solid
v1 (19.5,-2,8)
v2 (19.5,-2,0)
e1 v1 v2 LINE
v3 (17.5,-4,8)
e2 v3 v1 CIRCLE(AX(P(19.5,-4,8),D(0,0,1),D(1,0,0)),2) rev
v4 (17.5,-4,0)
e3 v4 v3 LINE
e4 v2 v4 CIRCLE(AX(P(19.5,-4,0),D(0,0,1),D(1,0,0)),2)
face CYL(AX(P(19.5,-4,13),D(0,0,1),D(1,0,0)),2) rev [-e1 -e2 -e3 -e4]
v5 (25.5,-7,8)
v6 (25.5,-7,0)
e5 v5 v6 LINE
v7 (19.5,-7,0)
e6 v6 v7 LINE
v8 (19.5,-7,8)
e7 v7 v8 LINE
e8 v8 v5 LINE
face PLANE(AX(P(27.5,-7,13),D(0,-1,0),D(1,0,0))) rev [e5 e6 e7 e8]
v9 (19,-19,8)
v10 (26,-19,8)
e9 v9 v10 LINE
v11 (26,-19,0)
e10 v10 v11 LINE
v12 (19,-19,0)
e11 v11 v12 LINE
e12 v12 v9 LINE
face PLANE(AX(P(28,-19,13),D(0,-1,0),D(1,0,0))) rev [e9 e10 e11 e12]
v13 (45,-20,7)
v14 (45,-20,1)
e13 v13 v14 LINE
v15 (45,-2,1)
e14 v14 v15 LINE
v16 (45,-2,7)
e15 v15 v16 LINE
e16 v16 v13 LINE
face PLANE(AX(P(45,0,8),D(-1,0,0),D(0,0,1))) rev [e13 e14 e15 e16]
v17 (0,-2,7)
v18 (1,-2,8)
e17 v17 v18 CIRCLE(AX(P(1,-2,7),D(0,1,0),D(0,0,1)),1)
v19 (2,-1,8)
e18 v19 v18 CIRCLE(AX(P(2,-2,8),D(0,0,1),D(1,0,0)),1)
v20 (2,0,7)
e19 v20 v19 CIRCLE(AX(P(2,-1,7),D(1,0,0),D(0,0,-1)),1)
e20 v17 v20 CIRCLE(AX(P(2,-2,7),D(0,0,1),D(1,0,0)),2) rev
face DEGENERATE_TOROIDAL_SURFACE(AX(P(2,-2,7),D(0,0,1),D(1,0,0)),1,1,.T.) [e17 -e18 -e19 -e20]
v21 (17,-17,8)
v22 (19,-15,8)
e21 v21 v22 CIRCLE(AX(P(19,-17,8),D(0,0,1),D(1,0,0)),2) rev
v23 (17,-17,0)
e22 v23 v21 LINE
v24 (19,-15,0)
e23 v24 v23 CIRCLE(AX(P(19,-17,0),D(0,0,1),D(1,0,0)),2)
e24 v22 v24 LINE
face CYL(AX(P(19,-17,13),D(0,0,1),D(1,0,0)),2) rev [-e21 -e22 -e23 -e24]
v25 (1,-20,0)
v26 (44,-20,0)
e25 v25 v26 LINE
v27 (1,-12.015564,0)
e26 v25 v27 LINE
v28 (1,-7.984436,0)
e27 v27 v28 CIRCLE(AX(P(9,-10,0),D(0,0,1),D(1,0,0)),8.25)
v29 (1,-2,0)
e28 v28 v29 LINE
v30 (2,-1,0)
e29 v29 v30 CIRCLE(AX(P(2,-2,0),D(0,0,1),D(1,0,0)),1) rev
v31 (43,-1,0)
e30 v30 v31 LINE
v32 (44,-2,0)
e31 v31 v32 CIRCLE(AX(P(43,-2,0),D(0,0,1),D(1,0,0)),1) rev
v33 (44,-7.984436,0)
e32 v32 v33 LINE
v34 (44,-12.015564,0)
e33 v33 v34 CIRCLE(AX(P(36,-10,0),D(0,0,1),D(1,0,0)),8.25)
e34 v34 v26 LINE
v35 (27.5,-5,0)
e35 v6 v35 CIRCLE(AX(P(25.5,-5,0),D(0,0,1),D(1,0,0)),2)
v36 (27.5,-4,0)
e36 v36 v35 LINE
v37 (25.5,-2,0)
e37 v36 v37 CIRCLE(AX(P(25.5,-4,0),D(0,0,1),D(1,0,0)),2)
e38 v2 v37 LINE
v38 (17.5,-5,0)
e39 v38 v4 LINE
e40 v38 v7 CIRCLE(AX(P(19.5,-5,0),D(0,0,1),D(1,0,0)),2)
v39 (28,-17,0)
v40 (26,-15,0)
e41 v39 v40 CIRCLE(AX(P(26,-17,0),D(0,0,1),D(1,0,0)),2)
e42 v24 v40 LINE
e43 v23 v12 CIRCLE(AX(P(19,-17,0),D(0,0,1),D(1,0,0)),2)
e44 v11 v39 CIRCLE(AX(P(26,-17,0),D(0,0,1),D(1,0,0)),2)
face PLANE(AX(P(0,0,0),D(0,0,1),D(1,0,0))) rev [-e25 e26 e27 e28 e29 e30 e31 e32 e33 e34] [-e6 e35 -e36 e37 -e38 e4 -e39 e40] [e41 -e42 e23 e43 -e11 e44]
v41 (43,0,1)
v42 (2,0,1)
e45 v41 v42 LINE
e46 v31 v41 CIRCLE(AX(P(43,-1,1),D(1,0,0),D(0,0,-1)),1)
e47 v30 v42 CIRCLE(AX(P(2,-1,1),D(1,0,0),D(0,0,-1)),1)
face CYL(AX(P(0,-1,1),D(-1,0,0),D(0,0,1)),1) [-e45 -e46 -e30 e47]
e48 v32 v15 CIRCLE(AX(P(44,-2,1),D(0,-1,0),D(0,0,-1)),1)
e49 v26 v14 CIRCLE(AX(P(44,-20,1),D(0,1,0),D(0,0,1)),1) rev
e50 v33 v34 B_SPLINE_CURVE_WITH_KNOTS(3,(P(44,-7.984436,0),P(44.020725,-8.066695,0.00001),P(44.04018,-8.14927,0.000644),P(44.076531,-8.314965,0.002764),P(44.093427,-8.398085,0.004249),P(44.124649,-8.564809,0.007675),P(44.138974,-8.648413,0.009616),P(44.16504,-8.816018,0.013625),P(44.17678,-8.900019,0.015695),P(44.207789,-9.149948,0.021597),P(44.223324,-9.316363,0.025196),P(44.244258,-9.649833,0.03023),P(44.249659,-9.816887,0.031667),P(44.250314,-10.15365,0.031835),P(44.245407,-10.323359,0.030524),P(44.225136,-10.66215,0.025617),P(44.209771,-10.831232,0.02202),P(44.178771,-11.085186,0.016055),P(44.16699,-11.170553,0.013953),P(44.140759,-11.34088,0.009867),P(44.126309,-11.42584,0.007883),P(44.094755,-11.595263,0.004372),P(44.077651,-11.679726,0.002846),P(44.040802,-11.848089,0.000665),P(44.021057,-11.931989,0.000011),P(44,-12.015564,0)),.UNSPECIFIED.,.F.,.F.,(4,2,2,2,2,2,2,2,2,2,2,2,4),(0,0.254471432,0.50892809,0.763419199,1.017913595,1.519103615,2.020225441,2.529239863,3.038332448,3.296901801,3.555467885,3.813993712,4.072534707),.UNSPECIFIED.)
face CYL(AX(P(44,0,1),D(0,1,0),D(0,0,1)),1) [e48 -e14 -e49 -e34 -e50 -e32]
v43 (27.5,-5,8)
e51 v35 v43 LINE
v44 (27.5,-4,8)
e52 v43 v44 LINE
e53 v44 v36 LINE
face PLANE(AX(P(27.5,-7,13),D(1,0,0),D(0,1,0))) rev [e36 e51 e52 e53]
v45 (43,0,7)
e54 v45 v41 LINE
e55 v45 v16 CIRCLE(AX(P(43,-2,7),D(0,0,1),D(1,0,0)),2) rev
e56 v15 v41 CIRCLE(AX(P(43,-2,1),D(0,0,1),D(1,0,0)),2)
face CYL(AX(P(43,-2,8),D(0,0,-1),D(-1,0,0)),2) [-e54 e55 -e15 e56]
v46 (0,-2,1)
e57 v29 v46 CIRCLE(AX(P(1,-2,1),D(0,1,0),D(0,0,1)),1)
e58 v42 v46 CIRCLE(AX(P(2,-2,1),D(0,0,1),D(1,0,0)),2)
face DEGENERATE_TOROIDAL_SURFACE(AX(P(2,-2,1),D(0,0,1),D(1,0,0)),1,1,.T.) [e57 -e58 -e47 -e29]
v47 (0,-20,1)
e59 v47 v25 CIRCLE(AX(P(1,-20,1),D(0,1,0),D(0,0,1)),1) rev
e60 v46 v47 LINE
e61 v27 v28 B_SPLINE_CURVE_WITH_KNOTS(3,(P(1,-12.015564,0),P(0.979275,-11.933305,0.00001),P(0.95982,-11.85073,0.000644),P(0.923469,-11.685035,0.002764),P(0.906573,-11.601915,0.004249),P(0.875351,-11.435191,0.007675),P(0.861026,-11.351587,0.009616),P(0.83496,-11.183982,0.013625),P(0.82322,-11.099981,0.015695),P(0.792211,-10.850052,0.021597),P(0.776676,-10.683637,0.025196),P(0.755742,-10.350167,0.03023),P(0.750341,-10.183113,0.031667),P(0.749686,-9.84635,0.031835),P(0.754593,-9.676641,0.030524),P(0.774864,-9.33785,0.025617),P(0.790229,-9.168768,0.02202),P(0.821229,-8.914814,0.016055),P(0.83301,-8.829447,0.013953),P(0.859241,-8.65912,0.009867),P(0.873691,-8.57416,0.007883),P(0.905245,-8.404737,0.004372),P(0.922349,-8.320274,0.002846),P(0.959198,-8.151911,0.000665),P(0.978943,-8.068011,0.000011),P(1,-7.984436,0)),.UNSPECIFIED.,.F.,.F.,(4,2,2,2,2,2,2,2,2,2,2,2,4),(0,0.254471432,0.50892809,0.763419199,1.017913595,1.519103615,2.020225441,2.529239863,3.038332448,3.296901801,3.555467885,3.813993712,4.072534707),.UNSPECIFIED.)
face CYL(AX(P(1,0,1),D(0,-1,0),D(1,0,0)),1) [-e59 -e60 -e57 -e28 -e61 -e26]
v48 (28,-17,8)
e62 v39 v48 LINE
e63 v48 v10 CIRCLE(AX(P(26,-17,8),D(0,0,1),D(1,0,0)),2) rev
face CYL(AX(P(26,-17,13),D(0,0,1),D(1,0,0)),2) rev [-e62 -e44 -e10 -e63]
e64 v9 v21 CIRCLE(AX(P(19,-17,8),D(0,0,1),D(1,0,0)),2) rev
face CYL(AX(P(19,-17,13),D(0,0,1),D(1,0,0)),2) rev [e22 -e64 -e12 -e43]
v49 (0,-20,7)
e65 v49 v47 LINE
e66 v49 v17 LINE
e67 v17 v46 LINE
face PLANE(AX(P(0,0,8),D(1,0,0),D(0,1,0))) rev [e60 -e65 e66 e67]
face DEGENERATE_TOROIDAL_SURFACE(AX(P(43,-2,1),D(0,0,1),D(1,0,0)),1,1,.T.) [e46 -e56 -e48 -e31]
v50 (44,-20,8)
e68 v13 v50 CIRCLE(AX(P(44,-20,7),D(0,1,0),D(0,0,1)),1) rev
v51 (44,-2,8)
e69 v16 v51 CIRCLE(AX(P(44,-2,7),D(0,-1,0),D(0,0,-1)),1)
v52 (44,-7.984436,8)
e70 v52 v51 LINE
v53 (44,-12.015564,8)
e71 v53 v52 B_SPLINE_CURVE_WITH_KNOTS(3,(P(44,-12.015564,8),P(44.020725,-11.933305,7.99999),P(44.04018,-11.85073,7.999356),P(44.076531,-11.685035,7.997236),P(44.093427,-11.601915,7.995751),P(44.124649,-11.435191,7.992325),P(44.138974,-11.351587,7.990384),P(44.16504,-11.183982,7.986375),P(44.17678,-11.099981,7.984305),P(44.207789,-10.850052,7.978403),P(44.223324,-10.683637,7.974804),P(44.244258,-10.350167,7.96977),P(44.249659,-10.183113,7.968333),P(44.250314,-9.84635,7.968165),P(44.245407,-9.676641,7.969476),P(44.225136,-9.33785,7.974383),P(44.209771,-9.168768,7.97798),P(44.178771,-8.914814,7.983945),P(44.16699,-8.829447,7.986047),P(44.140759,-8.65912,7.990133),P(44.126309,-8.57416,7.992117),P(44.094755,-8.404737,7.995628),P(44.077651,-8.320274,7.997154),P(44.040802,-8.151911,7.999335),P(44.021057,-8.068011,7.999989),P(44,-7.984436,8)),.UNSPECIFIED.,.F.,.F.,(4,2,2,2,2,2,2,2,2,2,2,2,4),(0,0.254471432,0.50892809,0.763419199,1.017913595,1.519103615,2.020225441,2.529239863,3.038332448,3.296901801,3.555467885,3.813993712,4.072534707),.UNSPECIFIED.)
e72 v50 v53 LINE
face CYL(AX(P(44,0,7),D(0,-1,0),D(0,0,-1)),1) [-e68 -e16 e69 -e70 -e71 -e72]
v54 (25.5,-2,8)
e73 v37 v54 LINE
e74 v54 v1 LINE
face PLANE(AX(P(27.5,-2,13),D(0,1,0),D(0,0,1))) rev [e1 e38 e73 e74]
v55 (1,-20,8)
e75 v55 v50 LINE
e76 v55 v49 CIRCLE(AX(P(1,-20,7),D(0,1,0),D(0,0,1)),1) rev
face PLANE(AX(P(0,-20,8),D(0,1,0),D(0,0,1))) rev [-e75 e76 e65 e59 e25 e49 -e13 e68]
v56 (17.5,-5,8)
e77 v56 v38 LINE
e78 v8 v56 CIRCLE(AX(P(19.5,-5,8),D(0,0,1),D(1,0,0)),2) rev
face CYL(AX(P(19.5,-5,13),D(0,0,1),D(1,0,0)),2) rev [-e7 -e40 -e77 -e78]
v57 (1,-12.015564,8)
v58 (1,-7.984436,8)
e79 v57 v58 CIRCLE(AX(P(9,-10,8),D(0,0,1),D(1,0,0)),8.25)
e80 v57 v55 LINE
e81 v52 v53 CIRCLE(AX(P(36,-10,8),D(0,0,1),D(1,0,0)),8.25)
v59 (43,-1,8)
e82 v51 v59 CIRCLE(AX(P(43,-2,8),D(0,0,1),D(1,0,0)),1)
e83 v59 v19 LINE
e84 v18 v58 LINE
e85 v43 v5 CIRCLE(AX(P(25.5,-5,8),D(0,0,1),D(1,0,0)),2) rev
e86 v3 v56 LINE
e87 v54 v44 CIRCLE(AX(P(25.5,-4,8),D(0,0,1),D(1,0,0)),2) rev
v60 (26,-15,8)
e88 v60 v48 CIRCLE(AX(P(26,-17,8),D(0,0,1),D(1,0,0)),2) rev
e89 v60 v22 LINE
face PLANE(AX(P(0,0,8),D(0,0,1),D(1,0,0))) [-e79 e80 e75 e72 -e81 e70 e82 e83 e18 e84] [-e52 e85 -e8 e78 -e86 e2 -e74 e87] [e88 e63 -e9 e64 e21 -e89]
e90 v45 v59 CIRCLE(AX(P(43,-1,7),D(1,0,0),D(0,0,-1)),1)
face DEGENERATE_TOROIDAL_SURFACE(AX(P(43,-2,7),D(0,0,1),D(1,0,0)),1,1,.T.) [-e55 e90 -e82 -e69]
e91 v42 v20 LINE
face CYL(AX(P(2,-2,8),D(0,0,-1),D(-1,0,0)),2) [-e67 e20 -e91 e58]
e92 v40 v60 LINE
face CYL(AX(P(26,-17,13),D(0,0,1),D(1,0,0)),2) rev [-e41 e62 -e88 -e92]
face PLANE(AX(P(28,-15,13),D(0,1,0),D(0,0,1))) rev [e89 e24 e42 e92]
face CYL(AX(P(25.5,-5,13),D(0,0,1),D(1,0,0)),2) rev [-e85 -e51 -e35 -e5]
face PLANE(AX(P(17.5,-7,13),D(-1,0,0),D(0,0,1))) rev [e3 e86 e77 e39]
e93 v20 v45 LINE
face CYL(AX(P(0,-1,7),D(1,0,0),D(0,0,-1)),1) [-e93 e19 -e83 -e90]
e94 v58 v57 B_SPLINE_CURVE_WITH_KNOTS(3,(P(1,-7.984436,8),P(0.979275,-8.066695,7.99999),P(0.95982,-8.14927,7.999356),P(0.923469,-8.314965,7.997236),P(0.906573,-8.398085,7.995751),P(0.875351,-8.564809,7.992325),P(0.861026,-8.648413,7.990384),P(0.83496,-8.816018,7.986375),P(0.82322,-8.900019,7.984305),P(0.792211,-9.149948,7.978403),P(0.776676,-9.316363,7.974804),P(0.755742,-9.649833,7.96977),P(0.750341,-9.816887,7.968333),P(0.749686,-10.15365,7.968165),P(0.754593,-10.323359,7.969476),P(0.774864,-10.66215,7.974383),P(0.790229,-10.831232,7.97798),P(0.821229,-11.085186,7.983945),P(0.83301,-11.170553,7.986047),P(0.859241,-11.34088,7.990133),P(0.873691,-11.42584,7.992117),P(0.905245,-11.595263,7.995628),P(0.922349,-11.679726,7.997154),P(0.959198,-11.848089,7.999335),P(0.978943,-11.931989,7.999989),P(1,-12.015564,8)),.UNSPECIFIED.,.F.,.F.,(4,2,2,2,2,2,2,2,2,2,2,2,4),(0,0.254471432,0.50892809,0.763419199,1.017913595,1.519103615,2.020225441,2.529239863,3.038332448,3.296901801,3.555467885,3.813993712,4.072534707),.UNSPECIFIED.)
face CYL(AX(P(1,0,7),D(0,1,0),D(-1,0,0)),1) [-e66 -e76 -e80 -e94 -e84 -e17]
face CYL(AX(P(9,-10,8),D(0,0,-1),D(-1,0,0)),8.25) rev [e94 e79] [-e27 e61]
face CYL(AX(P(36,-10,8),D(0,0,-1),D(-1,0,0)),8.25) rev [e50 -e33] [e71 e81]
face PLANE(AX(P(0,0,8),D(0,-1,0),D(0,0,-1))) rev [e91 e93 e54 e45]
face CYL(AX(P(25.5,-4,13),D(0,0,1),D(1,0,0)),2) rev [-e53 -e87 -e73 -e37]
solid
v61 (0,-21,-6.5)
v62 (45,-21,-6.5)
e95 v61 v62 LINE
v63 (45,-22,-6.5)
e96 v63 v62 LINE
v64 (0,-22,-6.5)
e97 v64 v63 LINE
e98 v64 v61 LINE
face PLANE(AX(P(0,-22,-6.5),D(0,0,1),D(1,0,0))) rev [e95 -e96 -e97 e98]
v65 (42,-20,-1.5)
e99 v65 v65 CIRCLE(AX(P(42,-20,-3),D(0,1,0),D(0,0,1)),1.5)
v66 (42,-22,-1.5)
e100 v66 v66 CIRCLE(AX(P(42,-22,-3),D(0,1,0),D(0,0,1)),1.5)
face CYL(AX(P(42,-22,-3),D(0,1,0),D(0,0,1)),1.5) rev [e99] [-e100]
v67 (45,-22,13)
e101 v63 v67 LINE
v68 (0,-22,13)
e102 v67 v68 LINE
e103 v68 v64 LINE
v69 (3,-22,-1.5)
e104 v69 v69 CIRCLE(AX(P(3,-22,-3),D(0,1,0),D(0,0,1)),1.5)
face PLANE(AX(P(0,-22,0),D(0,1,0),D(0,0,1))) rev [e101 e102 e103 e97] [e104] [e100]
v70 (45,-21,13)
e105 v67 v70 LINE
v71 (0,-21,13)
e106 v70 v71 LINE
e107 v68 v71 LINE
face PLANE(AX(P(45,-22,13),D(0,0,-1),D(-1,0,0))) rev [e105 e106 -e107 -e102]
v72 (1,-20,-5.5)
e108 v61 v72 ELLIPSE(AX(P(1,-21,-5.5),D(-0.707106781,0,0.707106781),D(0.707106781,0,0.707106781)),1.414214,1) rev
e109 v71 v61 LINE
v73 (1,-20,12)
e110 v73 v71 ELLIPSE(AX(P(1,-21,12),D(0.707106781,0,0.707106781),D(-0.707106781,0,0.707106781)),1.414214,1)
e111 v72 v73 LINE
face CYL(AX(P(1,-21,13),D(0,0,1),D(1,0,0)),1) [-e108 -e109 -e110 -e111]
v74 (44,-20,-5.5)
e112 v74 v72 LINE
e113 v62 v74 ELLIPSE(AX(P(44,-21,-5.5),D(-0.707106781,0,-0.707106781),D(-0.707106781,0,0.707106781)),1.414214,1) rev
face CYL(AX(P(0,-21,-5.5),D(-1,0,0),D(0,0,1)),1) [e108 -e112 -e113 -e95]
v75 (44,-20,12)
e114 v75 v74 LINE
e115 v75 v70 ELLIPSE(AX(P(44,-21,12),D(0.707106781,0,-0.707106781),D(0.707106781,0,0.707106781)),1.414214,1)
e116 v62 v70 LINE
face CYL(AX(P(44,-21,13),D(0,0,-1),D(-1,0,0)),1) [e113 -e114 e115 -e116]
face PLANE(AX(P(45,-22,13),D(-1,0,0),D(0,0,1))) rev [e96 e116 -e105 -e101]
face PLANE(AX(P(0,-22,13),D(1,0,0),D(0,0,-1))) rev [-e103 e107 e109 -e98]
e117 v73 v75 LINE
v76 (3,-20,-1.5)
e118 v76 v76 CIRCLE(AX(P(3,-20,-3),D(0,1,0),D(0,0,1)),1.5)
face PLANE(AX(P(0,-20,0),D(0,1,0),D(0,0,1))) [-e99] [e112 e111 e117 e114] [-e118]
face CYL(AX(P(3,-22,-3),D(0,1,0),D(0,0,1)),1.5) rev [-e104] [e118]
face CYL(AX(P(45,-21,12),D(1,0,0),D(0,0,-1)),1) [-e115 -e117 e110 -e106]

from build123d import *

# Parameters (mm, degrees)
CROQUIS1_W              = 45
CROQUIS1_H              = 20
CROQUIS1_R              = 8.25
SALIENTE_EXTRUIR1_DEPTH = 8
CROQUIS2_W              = 45
CROQUIS2_H              = 23
SALIENTE_EXTRUIR2_DEPTH = 2
CROQUIS4_W              = 11
CROQUIS4_H              = 4
CROQUIS4_W_2            = 10
CROQUIS4_H_2            = 5
CORTAR_EXTRUIR3_DEPTH   = 52.749396132
CROQUIS5_R              = 1.5
CORTAR_EXTRUIR4_DEPTH   = 51.931326313
REDONDEO1_R             = 2
REDONDEO2_R             = 2
REDONDEO3_R             = 1
CROQUIS6_W              = 45
CROQUIS6_H              = 3.5
CORTAR_EXTRUIR5_DEPTH   = 51.931326401
REDONDEO4_R             = 1


# Some blends are built 0.0001 mm under size
with BuildPart() as part:
    # Croquis1 → Saliente-Extruir1 (new body)
    with BuildSketch(Plane.XY):
        with Locations((22.5, -10)):
            Rectangle(CROQUIS1_W, CROQUIS1_H)
        with Locations((9, -10)):
            Circle(CROQUIS1_R, mode=Mode.SUBTRACT)
        with Locations((36, -10)):
            Circle(CROQUIS1_R, mode=Mode.SUBTRACT)
    extrude(amount=SALIENTE_EXTRUIR1_DEPTH)

    # Croquis4 → Cortar-Extruir3 (cut, through all)
    with BuildSketch(Plane(origin=(0, 0, 0), x_dir=(-1, 0, 0), z_dir=(0, 0, -1))):
        with Locations((-22.5, -17)):
            Rectangle(CROQUIS4_W, CROQUIS4_H)
        with Locations((-22.5, -4.5)):
            Rectangle(CROQUIS4_W_2, CROQUIS4_H_2)
    extrude(amount=-CORTAR_EXTRUIR3_DEPTH, mode=Mode.SUBTRACT)

    # Redondeo1
    redondeo1_edges = [part.edges().sort_by_distance(p)[0] for p in [
        (17, -19, 4),
        (28, -15, 4),
        (17, -15, 4),
        (28, -19, 4),
    ]]
    fillet(redondeo1_edges, radius=REDONDEO1_R - 0.0001)  # a hair under: the kernel refuses the full size

    # Redondeo2
    redondeo2_edges = [part.edges().sort_by_distance(p)[0] for p in [
        (17.5, -7, 4),
        (27.5, -7, 4),
        (27.5, -2, 4),
        (17.5, -2, 4),
        (0, 0, 4),
        (45, 0, 4),
    ]]
    fillet(redondeo2_edges, radius=REDONDEO2_R)

    # Redondeo3
    # the kernel refuses this fillet: 1 mm, written as the material it takes off along each edge
    with BuildSketch(Plane(origin=(45, -2, 8), x_dir=(0, 0, -1), z_dir=(0, -1, 0)), Plane(origin=(45, -2, 0), x_dir=(-1, 0, 0), z_dir=(0, -1, 0)), Plane(origin=(0, -22.5, 0), x_dir=(1, 0, 0), z_dir=(0, 1, 0)), Plane(origin=(0, -22.5, 8), x_dir=(0, 0, -1), z_dir=(0, 1, 0))) as redondeo3_piece_1:
        with BuildLine():
            CenterArc((REDONDEO3_R, -REDONDEO3_R), REDONDEO3_R, 90, 90)
            Line((0, -REDONDEO3_R), (0, 0))
            Line((0, 0), (REDONDEO3_R, 0))
        make_face()
    extrude(amount=20.5, mode=Mode.SUBTRACT)
    with BuildSketch(Plane(origin=(2, 0, 0), x_dir=(0, -1, 0), z_dir=(1, 0, 0)), Plane(origin=(2, 0, 8), x_dir=(0, 0, -1), z_dir=(1, 0, 0))) as redondeo3_piece_2:
        with BuildLine():
            CenterArc((REDONDEO3_R, -REDONDEO3_R), REDONDEO3_R, 90, 90)
            Line((0, -REDONDEO3_R), (0, 0))
            Line((0, 0), (REDONDEO3_R, 0))
        make_face()
    extrude(amount=41, mode=Mode.SUBTRACT)
    with BuildSketch(Plane(origin=(2, -2, 0), x_dir=(0, 1, 0), z_dir=(1, 0, 0))) as redondeo3_piece_3:
        with BuildLine():
            CenterArc((2 - REDONDEO3_R, REDONDEO3_R), REDONDEO3_R, 270, 90)
            Line((2, REDONDEO3_R), (2, 0))
            Line((2, 0), (2 - REDONDEO3_R, 0))
        make_face()
    revolve(axis=Axis((2, -2, 0), (0, 0, 1)), revolution_arc=90, mode=Mode.SUBTRACT)
    with BuildSketch(Plane(origin=(43, -2, 0), x_dir=(0, 1, 0), z_dir=(-1, 0, 0))) as redondeo3_piece_4:
        with BuildLine():
            CenterArc((2 - REDONDEO3_R, -REDONDEO3_R), REDONDEO3_R, 0, 90)
            Line((2, -REDONDEO3_R), (2, 0))
            Line((2, 0), (2 - REDONDEO3_R, 0))
        make_face()
    revolve(axis=Axis((43, -2, 0), (0, 0, -1)), revolution_arc=90, mode=Mode.SUBTRACT)
    with BuildSketch(Plane(origin=(2, -2, 8), x_dir=(0, 1, 0), z_dir=(1, 0, 0))) as redondeo3_piece_5:
        with BuildLine():
            CenterArc((2 - REDONDEO3_R, -REDONDEO3_R), REDONDEO3_R, 0, 90)
            Line((2 - REDONDEO3_R, 0), (2, 0))
            Line((2, 0), (2, -REDONDEO3_R))
        make_face()
    revolve(axis=Axis((2, -2, 8), (0, 0, 1)), revolution_arc=90, mode=Mode.SUBTRACT)
    with BuildSketch(Plane(origin=(43, -2, 8), x_dir=(0, 1, 0), z_dir=(-1, 0, 0))) as redondeo3_piece_6:
        with BuildLine():
            CenterArc((2 - REDONDEO3_R, REDONDEO3_R), REDONDEO3_R, 270, 90)
            Line((2 - REDONDEO3_R, 0), (2, 0))
            Line((2, 0), (2, REDONDEO3_R))
        make_face()
    revolve(axis=Axis((43, -2, 8), (0, 0, -1)), revolution_arc=90, mode=Mode.SUBTRACT)


with BuildPart() as body_2:
    # Croquis2 → Saliente-Extruir2 (new body)
    with BuildSketch(Plane(origin=(0, -20, 0), x_dir=(-1, 0, 0), z_dir=(0, -1, 0))):
        with Locations((-22.5, -1.5)):
            Rectangle(CROQUIS2_W, CROQUIS2_H)
    extrude(amount=SALIENTE_EXTRUIR2_DEPTH)

    # Croquis5 → Cortar-Extruir4 (cut, through all)
    with BuildSketch(Plane(origin=(0, -20, 0), x_dir=(1, 0, 0), z_dir=(0, 1, 0))):
        with Locations(Location((3, 3, 0), (0, 0, 270))):
            Circle(CROQUIS5_R)
        with Locations(Location((42, 3, 0), (0, 0, 270))):
            Circle(CROQUIS5_R)
    extrude(amount=-CORTAR_EXTRUIR4_DEPTH, mode=Mode.SUBTRACT)

    # Croquis6 → Cortar-Extruir5 (cut, through all)
    with BuildSketch(Plane(origin=(0, -20, 0), x_dir=(1, 0, 0), z_dir=(0, 1, 0))):
        with Locations((22.5, 8.25)):
            Rectangle(CROQUIS6_W, CROQUIS6_H)
    extrude(amount=-CORTAR_EXTRUIR5_DEPTH, mode=Mode.SUBTRACT)

    # Redondeo4
    redondeo4_edges = [body_2.edges().sort_by_distance(p)[0] for p in [
        (45, -20, 3.25),
        (22.5, -20, -6.5),
        (0, -20, 3.25),
        (22.5, -20, 13),
    ]]
    fillet(redondeo4_edges, radius=REDONDEO4_R)


solid = Compound([part.part, body_2.part])
